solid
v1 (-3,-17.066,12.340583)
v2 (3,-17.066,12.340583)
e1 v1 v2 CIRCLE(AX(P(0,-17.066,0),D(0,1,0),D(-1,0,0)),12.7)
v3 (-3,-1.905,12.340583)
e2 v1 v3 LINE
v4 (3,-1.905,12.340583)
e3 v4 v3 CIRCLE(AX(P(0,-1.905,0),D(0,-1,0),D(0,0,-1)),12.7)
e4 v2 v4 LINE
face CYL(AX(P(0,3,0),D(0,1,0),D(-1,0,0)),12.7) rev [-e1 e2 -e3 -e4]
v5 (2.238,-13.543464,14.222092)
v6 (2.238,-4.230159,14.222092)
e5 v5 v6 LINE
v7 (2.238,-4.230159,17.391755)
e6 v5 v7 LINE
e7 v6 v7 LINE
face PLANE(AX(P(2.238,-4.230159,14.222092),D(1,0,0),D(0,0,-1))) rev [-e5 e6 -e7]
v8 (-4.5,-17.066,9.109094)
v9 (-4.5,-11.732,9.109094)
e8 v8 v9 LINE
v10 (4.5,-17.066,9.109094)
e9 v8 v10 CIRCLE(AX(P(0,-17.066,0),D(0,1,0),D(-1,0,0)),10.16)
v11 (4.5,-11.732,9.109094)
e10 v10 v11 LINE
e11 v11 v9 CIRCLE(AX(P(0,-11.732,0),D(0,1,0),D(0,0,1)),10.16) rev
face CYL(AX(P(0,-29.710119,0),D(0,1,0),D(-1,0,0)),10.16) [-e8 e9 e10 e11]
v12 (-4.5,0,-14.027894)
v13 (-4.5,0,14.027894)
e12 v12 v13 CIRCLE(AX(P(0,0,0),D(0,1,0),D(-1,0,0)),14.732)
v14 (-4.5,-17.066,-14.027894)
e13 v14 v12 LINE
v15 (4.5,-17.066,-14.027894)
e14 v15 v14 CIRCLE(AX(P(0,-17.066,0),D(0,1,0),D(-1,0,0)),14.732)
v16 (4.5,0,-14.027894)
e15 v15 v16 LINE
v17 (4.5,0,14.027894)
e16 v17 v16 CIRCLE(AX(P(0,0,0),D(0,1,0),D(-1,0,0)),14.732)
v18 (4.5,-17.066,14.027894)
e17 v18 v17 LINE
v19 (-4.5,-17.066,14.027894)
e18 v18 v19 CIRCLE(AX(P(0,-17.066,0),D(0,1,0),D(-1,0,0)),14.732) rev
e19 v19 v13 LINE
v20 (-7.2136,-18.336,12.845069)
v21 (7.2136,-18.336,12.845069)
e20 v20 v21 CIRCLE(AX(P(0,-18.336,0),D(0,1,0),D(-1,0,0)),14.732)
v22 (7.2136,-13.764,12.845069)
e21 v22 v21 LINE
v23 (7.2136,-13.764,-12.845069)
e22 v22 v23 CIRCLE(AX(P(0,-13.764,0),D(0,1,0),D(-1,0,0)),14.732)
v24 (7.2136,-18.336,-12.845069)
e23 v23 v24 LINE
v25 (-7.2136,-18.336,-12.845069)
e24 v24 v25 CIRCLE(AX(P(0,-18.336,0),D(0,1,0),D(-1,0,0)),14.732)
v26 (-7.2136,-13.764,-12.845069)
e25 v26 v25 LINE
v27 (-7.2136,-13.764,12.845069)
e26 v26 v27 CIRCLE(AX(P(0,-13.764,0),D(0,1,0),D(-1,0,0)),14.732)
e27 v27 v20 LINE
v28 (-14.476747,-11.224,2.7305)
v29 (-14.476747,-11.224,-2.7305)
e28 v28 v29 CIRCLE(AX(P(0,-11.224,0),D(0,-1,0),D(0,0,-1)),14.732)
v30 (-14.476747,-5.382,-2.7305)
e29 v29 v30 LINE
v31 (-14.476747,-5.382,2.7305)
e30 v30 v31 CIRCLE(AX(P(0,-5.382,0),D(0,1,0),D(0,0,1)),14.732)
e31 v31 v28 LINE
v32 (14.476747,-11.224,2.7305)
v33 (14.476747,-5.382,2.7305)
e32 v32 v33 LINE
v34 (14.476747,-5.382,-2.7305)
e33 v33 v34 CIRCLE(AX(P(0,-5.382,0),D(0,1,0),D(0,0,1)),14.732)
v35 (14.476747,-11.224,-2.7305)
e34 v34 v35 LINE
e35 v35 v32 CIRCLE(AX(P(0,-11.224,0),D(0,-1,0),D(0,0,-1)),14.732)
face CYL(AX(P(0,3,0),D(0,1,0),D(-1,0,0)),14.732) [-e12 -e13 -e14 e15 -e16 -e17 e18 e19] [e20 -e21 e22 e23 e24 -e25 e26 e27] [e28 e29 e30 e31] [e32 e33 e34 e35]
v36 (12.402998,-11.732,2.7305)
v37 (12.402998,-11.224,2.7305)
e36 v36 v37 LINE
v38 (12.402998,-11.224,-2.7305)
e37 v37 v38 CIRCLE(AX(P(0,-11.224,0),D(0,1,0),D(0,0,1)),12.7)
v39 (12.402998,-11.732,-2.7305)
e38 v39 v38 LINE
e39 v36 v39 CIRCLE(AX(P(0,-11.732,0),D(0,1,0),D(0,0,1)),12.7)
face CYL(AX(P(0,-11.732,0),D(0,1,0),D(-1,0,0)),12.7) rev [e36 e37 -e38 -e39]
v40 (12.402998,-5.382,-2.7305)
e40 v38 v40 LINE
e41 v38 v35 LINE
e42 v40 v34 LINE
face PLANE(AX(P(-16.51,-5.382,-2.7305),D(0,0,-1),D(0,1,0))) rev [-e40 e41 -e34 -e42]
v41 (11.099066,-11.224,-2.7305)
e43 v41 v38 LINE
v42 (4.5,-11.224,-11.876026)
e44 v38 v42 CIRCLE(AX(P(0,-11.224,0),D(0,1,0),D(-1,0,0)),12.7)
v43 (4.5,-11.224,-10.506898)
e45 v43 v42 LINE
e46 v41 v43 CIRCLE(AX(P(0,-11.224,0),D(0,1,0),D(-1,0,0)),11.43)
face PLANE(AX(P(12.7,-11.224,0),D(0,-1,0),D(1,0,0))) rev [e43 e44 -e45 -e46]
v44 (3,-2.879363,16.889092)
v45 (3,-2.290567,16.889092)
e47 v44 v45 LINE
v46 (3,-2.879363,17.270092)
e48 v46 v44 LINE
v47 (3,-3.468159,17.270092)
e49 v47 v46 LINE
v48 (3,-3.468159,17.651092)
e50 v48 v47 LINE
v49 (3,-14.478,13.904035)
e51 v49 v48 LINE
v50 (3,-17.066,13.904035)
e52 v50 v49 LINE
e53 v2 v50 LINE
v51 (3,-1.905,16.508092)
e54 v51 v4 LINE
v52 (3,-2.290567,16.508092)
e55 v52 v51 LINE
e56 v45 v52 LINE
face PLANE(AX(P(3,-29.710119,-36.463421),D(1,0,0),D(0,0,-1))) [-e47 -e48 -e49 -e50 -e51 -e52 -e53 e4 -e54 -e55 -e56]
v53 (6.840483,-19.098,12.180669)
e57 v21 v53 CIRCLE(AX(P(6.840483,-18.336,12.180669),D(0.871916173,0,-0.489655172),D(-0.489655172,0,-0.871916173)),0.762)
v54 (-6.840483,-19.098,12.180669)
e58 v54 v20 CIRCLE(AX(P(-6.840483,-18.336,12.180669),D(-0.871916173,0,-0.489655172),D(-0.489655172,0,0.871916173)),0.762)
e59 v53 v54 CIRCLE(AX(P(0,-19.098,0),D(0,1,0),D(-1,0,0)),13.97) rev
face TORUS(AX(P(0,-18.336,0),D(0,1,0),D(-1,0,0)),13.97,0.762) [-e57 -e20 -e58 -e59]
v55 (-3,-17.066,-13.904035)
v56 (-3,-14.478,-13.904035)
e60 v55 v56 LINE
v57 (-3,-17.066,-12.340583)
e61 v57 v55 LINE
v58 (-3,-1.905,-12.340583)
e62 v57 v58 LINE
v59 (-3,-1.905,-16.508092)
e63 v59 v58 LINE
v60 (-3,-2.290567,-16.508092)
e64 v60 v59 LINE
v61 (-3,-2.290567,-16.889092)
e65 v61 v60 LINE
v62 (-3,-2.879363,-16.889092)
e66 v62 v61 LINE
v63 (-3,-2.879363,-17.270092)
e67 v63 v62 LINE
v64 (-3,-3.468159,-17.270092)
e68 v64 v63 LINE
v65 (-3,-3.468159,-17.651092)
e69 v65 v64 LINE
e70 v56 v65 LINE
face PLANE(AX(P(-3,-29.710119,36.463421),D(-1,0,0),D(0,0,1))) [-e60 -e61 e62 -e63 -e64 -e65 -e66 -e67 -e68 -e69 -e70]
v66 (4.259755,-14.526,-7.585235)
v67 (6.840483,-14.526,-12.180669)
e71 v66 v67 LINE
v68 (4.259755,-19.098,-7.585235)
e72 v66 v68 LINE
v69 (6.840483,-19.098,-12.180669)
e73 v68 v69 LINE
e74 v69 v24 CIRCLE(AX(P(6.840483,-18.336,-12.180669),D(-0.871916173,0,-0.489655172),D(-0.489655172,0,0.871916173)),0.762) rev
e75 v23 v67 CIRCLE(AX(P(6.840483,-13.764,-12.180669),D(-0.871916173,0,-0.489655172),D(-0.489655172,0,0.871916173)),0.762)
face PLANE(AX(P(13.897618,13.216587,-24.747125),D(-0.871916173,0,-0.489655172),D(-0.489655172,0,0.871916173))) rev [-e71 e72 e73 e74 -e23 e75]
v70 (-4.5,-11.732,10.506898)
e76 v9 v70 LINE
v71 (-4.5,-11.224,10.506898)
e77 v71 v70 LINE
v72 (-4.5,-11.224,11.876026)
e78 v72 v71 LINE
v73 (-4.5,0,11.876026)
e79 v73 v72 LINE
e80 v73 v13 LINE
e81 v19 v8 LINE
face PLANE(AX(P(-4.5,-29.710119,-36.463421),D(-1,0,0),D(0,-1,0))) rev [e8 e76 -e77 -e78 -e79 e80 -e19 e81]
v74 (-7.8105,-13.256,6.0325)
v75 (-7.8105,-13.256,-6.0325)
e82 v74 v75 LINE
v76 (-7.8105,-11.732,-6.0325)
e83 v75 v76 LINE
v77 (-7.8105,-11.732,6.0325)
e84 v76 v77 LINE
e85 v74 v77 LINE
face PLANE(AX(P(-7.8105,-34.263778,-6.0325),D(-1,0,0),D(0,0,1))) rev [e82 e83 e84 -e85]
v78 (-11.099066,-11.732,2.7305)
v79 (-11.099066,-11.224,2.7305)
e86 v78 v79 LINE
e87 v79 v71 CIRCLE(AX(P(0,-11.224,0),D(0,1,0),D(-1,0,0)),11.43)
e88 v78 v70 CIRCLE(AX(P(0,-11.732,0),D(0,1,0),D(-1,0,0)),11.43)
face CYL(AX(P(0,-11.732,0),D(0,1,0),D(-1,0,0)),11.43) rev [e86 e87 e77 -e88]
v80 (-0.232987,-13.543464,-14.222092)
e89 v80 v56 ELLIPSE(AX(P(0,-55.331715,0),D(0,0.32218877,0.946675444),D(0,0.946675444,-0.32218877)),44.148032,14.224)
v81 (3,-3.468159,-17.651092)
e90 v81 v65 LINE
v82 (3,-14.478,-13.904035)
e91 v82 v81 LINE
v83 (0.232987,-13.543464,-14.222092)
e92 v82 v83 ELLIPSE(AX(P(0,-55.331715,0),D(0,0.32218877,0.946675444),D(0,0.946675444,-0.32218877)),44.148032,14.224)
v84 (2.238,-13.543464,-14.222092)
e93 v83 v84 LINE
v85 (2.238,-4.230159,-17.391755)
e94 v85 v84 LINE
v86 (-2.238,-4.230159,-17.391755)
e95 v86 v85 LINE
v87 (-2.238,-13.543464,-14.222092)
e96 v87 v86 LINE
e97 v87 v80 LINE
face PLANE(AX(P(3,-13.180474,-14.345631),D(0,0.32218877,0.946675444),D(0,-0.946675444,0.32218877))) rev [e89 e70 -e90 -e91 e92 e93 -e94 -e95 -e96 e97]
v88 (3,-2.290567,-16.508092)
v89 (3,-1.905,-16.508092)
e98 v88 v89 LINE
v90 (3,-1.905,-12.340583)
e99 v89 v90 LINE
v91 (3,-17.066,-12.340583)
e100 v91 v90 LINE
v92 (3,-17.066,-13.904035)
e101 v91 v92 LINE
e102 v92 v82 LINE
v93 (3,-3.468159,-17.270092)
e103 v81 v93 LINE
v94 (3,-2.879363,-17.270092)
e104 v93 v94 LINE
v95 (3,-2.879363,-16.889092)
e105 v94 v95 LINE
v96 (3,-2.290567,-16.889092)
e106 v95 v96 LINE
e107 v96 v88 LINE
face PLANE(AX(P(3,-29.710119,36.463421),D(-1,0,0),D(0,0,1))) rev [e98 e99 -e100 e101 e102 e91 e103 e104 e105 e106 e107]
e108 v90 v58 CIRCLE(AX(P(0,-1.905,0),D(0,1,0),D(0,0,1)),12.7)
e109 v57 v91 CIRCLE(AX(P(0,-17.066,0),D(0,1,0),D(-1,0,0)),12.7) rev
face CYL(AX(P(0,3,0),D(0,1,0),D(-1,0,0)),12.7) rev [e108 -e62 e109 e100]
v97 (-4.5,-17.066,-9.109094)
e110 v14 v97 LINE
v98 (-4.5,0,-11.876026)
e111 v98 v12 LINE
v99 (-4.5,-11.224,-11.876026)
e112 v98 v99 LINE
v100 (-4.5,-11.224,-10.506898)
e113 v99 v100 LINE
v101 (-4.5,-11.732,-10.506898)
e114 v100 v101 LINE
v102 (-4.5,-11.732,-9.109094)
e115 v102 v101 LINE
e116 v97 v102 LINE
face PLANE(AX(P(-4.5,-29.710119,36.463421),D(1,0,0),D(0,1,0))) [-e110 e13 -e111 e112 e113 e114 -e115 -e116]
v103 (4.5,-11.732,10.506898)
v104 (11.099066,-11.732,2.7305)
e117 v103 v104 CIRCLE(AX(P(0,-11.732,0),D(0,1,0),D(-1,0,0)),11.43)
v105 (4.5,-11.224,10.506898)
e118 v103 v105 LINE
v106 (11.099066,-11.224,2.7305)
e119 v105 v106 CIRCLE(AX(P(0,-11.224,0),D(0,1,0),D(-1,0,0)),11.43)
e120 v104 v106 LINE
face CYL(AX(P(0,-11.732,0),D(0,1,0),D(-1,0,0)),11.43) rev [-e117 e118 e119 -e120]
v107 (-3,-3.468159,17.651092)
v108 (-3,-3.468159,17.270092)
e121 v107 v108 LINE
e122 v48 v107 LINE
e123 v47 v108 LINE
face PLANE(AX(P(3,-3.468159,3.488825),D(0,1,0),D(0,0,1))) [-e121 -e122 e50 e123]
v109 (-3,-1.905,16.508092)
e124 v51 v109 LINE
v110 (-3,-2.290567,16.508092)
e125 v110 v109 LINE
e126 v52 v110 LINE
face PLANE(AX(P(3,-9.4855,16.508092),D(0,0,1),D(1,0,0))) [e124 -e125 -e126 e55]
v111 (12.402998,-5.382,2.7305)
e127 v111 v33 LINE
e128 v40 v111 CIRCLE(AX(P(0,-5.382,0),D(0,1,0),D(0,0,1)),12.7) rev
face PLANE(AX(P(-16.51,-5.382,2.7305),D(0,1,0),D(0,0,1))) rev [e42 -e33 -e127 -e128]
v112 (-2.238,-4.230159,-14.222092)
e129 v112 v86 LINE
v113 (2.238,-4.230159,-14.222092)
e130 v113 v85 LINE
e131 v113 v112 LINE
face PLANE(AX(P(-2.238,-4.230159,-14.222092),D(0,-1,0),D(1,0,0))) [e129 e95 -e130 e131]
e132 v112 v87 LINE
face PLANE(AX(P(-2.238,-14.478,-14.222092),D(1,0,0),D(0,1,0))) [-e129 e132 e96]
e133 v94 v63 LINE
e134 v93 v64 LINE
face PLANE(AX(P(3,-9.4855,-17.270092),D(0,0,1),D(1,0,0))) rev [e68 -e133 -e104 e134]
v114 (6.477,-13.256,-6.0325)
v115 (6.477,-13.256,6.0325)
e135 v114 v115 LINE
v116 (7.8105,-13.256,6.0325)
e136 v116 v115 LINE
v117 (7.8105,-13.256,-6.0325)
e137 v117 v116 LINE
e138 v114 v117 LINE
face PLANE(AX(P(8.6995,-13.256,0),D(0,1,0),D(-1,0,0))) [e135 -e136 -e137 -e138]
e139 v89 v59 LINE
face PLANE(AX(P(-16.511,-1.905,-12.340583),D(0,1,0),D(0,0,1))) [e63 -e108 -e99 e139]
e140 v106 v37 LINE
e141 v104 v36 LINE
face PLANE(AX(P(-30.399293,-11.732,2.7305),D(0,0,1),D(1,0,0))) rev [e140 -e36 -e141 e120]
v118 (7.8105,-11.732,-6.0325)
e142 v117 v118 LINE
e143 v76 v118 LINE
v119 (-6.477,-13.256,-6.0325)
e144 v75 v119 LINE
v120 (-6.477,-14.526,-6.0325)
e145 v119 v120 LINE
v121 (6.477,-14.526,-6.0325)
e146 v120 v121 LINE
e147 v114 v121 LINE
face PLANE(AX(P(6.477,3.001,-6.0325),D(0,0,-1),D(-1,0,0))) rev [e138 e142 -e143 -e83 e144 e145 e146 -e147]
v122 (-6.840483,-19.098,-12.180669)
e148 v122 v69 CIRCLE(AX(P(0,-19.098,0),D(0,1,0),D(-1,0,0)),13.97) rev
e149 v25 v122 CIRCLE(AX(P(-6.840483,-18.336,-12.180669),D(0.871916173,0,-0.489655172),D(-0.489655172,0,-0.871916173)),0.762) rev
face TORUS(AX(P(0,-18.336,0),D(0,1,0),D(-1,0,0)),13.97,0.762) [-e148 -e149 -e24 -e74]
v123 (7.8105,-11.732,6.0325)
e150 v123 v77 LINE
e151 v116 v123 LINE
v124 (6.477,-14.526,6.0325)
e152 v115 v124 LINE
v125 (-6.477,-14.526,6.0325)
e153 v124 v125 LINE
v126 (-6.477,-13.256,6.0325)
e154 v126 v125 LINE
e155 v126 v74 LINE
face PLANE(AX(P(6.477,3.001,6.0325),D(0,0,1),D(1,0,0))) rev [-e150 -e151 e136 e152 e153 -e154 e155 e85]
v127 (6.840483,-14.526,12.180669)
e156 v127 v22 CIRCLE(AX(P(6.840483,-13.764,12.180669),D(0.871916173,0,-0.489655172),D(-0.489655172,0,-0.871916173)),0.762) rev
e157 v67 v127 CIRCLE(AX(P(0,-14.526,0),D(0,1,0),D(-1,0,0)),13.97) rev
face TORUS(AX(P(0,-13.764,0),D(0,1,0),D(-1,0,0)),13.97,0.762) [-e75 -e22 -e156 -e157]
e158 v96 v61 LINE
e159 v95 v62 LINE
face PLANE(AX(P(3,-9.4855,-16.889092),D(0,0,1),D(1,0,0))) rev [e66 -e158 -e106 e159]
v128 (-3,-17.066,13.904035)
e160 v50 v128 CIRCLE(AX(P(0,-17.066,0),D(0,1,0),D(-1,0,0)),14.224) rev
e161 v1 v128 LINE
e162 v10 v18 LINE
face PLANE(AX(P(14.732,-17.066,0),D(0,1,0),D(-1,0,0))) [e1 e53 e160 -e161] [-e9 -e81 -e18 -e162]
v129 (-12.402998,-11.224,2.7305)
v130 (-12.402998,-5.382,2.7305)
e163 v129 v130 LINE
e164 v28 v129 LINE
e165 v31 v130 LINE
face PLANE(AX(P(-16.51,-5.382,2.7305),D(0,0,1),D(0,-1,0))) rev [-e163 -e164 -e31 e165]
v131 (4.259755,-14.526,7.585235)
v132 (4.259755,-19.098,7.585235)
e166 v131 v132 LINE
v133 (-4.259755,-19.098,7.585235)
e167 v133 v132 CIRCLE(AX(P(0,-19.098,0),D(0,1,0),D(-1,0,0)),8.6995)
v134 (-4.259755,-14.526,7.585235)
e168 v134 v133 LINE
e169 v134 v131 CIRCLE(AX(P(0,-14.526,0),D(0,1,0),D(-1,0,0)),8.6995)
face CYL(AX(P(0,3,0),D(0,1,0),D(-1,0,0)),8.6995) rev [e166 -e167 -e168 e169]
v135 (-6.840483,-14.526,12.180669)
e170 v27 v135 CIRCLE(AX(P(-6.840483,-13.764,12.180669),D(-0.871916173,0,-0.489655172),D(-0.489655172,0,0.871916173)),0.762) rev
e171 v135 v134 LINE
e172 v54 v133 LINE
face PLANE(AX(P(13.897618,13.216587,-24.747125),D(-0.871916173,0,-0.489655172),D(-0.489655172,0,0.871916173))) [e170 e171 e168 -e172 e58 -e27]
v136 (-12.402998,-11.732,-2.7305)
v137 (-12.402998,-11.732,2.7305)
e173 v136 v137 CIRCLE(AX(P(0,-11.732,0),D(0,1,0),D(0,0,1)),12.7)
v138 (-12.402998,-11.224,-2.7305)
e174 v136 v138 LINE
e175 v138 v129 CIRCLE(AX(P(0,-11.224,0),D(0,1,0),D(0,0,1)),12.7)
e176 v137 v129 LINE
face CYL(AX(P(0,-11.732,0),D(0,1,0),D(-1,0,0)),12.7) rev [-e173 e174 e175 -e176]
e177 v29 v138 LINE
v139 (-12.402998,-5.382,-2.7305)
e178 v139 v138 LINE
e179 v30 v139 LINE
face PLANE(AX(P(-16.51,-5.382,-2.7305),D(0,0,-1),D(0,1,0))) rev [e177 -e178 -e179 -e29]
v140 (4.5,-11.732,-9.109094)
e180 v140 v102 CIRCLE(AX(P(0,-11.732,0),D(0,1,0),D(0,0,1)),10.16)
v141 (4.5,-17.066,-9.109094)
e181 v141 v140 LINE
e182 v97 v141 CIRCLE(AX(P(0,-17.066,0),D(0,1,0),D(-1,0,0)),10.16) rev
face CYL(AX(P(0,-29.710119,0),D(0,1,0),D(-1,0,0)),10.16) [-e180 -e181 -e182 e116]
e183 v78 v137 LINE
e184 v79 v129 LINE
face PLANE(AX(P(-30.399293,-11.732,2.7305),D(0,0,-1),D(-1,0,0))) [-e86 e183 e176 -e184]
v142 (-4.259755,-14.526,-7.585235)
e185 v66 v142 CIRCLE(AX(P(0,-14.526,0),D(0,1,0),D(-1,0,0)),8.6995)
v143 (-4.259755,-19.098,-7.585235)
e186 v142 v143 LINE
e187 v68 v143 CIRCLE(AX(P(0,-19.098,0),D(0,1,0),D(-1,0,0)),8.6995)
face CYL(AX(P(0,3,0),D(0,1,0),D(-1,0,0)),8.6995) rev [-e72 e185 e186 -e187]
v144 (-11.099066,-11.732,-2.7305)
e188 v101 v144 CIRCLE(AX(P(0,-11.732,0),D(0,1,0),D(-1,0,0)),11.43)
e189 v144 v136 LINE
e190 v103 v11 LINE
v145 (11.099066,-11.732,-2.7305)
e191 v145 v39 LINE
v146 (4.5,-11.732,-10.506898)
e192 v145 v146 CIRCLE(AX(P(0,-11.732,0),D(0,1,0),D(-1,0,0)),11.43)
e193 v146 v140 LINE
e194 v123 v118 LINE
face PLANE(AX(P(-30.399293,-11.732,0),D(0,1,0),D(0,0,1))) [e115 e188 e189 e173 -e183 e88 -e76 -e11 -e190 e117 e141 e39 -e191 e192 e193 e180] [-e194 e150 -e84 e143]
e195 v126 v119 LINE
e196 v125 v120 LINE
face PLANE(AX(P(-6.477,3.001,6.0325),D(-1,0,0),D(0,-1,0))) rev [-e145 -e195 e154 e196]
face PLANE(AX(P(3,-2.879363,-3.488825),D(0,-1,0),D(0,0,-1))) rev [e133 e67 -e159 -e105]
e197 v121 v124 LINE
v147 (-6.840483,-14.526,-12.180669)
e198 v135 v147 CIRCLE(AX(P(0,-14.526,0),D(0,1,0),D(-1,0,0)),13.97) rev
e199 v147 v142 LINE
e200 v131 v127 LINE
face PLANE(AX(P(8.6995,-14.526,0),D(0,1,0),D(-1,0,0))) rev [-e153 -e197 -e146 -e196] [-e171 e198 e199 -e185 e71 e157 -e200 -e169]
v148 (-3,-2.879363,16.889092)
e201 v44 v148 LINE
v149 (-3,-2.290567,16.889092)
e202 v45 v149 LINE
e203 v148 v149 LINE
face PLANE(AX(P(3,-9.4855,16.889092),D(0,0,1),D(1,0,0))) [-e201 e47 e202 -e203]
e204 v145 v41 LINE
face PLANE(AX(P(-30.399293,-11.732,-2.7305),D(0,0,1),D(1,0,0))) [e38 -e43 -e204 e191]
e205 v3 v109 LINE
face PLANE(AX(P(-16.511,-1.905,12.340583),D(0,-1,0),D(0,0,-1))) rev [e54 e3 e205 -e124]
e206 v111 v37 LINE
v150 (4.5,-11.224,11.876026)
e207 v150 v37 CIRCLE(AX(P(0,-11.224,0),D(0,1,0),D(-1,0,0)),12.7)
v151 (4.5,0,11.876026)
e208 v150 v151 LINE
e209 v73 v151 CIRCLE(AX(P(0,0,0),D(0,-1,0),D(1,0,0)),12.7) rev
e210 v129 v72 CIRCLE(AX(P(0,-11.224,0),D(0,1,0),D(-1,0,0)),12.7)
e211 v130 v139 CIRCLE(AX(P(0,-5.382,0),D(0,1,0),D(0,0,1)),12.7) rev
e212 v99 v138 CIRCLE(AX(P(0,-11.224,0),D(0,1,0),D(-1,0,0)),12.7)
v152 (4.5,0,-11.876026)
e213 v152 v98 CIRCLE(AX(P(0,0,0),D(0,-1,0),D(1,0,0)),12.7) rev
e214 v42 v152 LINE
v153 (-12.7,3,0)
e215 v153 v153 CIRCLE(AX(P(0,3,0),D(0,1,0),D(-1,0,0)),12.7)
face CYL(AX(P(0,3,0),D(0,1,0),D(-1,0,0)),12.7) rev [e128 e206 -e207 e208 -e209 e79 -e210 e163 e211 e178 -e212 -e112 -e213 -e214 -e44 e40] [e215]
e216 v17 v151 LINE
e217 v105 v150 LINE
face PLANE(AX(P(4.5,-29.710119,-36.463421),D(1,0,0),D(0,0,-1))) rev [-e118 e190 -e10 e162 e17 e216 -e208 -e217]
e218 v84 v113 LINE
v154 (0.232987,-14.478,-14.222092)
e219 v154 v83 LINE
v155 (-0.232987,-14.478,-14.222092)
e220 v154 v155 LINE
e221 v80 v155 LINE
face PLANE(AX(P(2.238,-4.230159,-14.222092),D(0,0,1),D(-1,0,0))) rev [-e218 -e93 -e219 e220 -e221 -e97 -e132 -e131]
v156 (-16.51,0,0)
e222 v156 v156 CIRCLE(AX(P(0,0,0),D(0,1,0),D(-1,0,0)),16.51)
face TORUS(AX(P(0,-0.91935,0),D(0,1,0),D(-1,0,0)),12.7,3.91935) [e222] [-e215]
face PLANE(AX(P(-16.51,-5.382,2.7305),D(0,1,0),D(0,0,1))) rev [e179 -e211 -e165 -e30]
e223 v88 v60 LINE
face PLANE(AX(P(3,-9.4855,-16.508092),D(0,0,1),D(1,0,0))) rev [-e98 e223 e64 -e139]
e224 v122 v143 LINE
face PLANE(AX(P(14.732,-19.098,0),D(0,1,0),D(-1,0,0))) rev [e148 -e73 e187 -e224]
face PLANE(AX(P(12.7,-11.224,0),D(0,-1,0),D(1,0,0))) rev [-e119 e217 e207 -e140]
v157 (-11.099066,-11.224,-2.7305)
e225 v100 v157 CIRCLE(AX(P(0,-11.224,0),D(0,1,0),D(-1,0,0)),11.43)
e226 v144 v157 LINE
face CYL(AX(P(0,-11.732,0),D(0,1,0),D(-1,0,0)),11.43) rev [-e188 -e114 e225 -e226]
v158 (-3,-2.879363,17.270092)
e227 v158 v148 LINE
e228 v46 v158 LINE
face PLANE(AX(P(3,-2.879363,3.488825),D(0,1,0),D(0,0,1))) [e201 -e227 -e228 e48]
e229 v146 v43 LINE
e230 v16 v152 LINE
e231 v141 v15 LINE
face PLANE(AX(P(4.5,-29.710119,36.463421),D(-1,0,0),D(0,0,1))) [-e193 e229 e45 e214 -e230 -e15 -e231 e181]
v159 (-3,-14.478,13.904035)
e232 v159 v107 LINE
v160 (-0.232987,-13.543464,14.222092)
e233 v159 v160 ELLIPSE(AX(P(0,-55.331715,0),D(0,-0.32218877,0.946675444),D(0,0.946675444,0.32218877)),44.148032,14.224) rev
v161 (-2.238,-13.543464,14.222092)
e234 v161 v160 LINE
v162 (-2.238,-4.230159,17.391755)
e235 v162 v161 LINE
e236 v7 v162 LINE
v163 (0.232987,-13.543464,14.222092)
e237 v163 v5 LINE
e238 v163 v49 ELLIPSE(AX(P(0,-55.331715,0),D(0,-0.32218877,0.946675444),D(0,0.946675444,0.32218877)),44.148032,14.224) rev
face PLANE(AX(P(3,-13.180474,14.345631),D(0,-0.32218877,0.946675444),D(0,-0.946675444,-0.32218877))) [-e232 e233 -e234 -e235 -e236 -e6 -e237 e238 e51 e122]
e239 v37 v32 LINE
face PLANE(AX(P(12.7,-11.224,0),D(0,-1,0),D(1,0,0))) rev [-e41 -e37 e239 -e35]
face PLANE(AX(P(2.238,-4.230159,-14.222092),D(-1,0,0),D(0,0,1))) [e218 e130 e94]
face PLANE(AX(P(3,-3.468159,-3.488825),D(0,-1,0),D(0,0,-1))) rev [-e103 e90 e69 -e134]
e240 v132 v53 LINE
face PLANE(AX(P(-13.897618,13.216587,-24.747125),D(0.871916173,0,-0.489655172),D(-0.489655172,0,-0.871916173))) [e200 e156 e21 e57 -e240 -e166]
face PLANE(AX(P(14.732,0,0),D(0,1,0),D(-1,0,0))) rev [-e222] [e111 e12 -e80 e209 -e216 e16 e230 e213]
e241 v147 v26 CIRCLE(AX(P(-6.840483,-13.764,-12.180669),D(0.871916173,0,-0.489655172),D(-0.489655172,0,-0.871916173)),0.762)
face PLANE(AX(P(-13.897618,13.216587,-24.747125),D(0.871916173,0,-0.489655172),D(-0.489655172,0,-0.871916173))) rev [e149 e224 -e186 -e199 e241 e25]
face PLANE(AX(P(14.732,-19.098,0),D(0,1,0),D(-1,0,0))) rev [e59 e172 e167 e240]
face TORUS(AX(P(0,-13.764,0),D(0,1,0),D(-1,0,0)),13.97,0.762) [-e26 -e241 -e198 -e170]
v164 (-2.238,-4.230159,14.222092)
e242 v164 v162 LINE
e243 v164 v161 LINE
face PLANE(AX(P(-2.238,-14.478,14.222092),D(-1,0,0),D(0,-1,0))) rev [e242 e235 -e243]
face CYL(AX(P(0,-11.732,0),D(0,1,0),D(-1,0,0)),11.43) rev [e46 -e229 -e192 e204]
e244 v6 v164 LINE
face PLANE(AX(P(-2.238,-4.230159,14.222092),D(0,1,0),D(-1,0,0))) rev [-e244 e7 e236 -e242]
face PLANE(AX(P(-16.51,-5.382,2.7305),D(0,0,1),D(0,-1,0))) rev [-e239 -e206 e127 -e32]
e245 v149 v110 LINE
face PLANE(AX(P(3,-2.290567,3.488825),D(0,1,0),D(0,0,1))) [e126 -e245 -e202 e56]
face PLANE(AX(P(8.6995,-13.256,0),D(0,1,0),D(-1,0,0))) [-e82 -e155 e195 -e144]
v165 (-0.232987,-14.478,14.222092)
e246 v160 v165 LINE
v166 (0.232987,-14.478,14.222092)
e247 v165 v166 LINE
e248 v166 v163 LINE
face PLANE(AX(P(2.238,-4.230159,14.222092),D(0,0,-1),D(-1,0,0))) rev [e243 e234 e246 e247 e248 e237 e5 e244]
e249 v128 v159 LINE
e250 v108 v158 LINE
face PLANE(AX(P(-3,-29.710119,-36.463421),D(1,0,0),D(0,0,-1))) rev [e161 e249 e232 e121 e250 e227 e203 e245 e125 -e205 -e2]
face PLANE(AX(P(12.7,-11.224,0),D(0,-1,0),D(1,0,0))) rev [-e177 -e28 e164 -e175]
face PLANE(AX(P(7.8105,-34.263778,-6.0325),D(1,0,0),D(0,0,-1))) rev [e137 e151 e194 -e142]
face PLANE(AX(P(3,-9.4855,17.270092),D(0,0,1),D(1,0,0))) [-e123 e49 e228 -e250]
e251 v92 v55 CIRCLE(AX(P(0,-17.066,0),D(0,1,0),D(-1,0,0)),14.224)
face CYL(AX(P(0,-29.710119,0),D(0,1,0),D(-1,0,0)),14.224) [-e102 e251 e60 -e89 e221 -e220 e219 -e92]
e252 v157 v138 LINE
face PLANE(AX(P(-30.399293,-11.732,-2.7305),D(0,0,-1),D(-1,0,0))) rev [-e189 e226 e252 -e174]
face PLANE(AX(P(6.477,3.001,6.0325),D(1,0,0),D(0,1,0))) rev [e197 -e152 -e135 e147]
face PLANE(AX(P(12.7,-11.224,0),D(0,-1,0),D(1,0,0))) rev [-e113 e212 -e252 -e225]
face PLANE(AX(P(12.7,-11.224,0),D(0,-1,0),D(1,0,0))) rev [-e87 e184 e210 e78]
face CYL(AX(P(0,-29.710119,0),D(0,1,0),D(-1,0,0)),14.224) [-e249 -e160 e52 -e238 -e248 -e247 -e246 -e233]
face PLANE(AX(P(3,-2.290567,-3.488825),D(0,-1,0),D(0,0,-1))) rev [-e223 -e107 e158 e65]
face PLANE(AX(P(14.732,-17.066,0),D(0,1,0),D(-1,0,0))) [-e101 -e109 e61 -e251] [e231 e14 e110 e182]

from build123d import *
from build123d.topology import SkipClean

# Parameters (mm, degrees)
FEET_DEPTH            = 4.572
SWITCH_HOLE_REACH     = 31.195
SKETCH2_W             = 12.954
SKETCH2_H             = 12.065
SQUARE_DEPTH          = 31.164446025
SQUARE_DEPTH_BACK     = 31.164446025
SKETCH6_W             = 5.461
SKETCH6_H             = 5.842
EXTRUDE3_START        = -0.508
SKETCH4_W             = 12.954
SKETCH4_H             = 12.065
EXTRUDE3_DEPTH        = 0.508
SKETCH5_W             = 15.621
SKETCH5_H             = 12.065
SWITCH_HOLE2_DEPTH    = 1.524
TAB_CIRC_CUTOUT_DEPTH = 17.066
TAB_START             = -6
TAB_TOP_OUTLINE_W     = 2.54
TAB_TOP_OUTLINE_H     = 1.905
TAB_TOP_DEPTH         = 6
TAB_WEDGE_DEPTH       = 3
SKETCH11_W            = 4.476
SKETCH11_H            = 10.247840718
CUT_TAB_DEPTH         = 3.556
FILLET1_R             = 0.762


# Read off the part's stored shape, not the designer's step: tab circ cutout, tab top
with BuildPart() as part:
    # Sketch1 → Revolve1 (revolve)
    with BuildSketch(Plane.XY, mode=Mode.PRIVATE) as revolve1_sk:
        with BuildLine():
            Line((14.732, 0), (16.51, 0))
            ThreePointArc((16.51, 0), (15.124670081, 2.159981002), (12.7, 3))
            Line((12.7, 3), (12.7, -11.224))
            Line((12.7, -11.224), (0, -11.224))
            Line((0, -11.224), (0, -14.526))
            Line((0, -14.526), (8.6995, -14.526))
            Line((8.6995, -14.526), (8.6995, -19.098))
            Line((8.6995, -19.098), (14.732, -19.098))
            Line((14.732, -19.098), (14.732, 0))
        make_face()
    revolve(revolve1_sk.sketch.rotate(Axis((0, 3, 0), (0, -1, 0)), 180), axis=Axis((0, 3, 0), (0, -1, 0)))

    # Sketch3 → feet (cut)
    with BuildSketch(Plane.XZ.offset(19.098)):
        with BuildLine():
            ThreePointArc((-7.2136, 12.845069055), (-14.732, 0), (-7.2136, -12.845069055))
            Line((-7.2136, -12.845069055), (-4.259755172, -7.585234744))
            ThreePointArc((-4.259755172, -7.585234744), (-8.6995, 0), (-4.259755172, 7.585234744))
            Line((-4.259755172, 7.585234744), (-7.2136, 12.845069055))
        make_face()
        with BuildLine():
            Line((4.259755172, -7.585234744), (7.2136, -12.845069055))
            ThreePointArc((7.2136, -12.845069055), (14.732, 0), (7.2136, 12.845069055))
            Line((7.2136, 12.845069055), (4.259755172, 7.585234744))
            ThreePointArc((4.259755172, 7.585234744), (8.6995, 0), (4.259755172, -7.585234744))
        make_face()
    extrude(amount=-FEET_DEPTH, mode=Mode.SUBTRACT)

    # Sketch2 → switch hole (cut, up to next)
    with BuildSketch(Plane.XZ.offset(14.526), mode=Mode.PRIVATE) as switch_hole_sk1:
        Rectangle(SKETCH2_W, SKETCH2_H)
    switch_hole_tool1 = extrude(switch_hole_sk1.sketch, amount=-SWITCH_HOLE_REACH, mode=Mode.PRIVATE) & part.part
    add(switch_hole_tool1.solids().sort_by_distance((0, -14.526, 0))[0], mode=Mode.SUBTRACT)

    # Sketch6 → square (cut, two sides: drawn at the far end of the back side and taken through both)
    with BuildSketch(Plane(origin=(0, 0, 0), x_dir=(0, 0, -1), z_dir=(1, 0, 0)).offset(-SQUARE_DEPTH_BACK)):
        with Locations((0, -8.303)):
            Rectangle(SKETCH6_W, SKETCH6_H)
    extrude(amount=SQUARE_DEPTH + SQUARE_DEPTH_BACK, mode=Mode.SUBTRACT)

    # Sketch4 → Extrude3 (cut)
    with BuildSketch(Plane(origin=(0, -11.224, 0), x_dir=(1, 0, 0), z_dir=(0, 1, 0)).offset(EXTRUDE3_START)):
        with BuildLine():
            Line((11.099066166, -2.7305), (12.402998418, -2.7305))
            ThreePointArc((12.402998418, -2.7305), (12.7, 0), (12.402998418, 2.7305))
            Line((12.402998418, 2.7305), (11.099066166, 2.7305))
            ThreePointArc((11.099066166, 2.7305), (0, 11.43), (-11.099066166, 2.7305))
            Line((-11.099066166, 2.7305), (-12.402998418, 2.7305))
            ThreePointArc((-12.402998418, 2.7305), (-12.7, 0), (-12.402998418, -2.7305))
            Line((-12.402998418, -2.7305), (-11.099066166, -2.7305))
            ThreePointArc((-11.099066166, -2.7305), (0, -11.43), (11.099066166, -2.7305))
        make_face()
        Rectangle(SKETCH4_W, SKETCH4_H, mode=Mode.SUBTRACT)
    extrude(amount=EXTRUDE3_DEPTH, mode=Mode.SUBTRACT)

    # Sketch5 → switch hole2 (cut)
    with BuildSketch(Plane(origin=(0, -11.732, 0), x_dir=(1, 0, 0), z_dir=(0, 1, 0))):
        Rectangle(SKETCH5_W, SKETCH5_H)
    extrude(amount=-SWITCH_HOLE2_DEPTH, mode=Mode.SUBTRACT)

    # tab circ cutout outline → tab circ cutout (cut)
    with BuildSketch(Plane.XZ):
        with BuildLine():
            ThreePointArc((-4.5, 9.109094357), (0, 10.16), (4.5, 9.109094357))
            Line((4.5, 9.109094357), (4.5, 14.027894496))
            ThreePointArc((4.5, 14.027894496), (0, 14.732), (-4.5, 14.027894496))
            Line((-4.5, 14.027894496), (-4.5, 9.109094357))
        make_face()
        with BuildLine():
            ThreePointArc((3, 12.340583455), (0, 12.7), (-3, 12.340583455))
            Line((-3, 12.340583455), (-3, 13.904034522))
            ThreePointArc((-3, 13.904034522), (0, 14.224), (3, 13.904034522))
            Line((3, 13.904034522), (3, 12.340583455))
        make_face(mode=Mode.SUBTRACT)
    tab_circ_cutout = extrude(amount=TAB_CIRC_CUTOUT_DEPTH, mode=Mode.SUBTRACT)

    # tab top outline → tab top (cut)
    with SkipClean():  # the faces are left unmerged after this step: merging them gives an invalid solid
        with BuildSketch(Plane(origin=(3, 0, 0), x_dir=(0, 0, -1), z_dir=(1, 0, 0)).offset(TAB_START)):
            with Locations((-13.610583455, -0.9525)):
                Rectangle(TAB_TOP_OUTLINE_W, TAB_TOP_OUTLINE_H)
        tab_top = extrude(amount=TAB_TOP_DEPTH, mode=Mode.SUBTRACT)
    add(part.part.scale(1), mode=Mode.REPLACE)  # the faces are merged on a copy

    # Sketch10 → tab wedge (add, symmetric)
    with BuildSketch(Plane(origin=(0, 0, 0), x_dir=(0, 0, -1), z_dir=(1, 0, 0))):
        Polygon((-13.904034522, -1.905), (-13.904034522, -14.478), (-17.651091727, -3.468159282), (-17.270091727, -3.468159282), (-17.270091727, -2.879362986), (-16.889091727, -2.879362986), (-16.889091727, -2.290566689), (-16.508091727, -2.290566689), (-16.508091727, -1.905), align=None)
    tab_wedge = extrude(amount=TAB_WEDGE_DEPTH, both=True)

    # Sketch11 → cut tab (cut)
    with BuildSketch(Plane.XY.offset(17.778091727)):
        with Locations((0, -9.354079641)):
            Rectangle(SKETCH11_W, SKETCH11_H)
    cut_tab = extrude(amount=-CUT_TAB_DEPTH, mode=Mode.SUBTRACT)

    # tab mirror: tab circ cutout, tab top, tab wedge, cut tab across plane
    add(tab_circ_cutout.mirror(Plane.XY), mode=Mode.SUBTRACT)
    add(tab_top.mirror(Plane.XY), mode=Mode.SUBTRACT)
    add(tab_wedge.mirror(Plane.XY))
    add(cut_tab.mirror(Plane.XY), mode=Mode.SUBTRACT)

    # Fillet1
    fillet1_edges = [part.edges().sort_by_distance(p)[0] for p in [
        (0, -19.098, -14.732),
        (14.732, -14.526, 0),
        (0, -19.098, 14.732),
        (-12.714216043, -14.526, -7.441809887),
    ]]
    fillet(fillet1_edges, radius=FILLET1_R)


solid = part.part
